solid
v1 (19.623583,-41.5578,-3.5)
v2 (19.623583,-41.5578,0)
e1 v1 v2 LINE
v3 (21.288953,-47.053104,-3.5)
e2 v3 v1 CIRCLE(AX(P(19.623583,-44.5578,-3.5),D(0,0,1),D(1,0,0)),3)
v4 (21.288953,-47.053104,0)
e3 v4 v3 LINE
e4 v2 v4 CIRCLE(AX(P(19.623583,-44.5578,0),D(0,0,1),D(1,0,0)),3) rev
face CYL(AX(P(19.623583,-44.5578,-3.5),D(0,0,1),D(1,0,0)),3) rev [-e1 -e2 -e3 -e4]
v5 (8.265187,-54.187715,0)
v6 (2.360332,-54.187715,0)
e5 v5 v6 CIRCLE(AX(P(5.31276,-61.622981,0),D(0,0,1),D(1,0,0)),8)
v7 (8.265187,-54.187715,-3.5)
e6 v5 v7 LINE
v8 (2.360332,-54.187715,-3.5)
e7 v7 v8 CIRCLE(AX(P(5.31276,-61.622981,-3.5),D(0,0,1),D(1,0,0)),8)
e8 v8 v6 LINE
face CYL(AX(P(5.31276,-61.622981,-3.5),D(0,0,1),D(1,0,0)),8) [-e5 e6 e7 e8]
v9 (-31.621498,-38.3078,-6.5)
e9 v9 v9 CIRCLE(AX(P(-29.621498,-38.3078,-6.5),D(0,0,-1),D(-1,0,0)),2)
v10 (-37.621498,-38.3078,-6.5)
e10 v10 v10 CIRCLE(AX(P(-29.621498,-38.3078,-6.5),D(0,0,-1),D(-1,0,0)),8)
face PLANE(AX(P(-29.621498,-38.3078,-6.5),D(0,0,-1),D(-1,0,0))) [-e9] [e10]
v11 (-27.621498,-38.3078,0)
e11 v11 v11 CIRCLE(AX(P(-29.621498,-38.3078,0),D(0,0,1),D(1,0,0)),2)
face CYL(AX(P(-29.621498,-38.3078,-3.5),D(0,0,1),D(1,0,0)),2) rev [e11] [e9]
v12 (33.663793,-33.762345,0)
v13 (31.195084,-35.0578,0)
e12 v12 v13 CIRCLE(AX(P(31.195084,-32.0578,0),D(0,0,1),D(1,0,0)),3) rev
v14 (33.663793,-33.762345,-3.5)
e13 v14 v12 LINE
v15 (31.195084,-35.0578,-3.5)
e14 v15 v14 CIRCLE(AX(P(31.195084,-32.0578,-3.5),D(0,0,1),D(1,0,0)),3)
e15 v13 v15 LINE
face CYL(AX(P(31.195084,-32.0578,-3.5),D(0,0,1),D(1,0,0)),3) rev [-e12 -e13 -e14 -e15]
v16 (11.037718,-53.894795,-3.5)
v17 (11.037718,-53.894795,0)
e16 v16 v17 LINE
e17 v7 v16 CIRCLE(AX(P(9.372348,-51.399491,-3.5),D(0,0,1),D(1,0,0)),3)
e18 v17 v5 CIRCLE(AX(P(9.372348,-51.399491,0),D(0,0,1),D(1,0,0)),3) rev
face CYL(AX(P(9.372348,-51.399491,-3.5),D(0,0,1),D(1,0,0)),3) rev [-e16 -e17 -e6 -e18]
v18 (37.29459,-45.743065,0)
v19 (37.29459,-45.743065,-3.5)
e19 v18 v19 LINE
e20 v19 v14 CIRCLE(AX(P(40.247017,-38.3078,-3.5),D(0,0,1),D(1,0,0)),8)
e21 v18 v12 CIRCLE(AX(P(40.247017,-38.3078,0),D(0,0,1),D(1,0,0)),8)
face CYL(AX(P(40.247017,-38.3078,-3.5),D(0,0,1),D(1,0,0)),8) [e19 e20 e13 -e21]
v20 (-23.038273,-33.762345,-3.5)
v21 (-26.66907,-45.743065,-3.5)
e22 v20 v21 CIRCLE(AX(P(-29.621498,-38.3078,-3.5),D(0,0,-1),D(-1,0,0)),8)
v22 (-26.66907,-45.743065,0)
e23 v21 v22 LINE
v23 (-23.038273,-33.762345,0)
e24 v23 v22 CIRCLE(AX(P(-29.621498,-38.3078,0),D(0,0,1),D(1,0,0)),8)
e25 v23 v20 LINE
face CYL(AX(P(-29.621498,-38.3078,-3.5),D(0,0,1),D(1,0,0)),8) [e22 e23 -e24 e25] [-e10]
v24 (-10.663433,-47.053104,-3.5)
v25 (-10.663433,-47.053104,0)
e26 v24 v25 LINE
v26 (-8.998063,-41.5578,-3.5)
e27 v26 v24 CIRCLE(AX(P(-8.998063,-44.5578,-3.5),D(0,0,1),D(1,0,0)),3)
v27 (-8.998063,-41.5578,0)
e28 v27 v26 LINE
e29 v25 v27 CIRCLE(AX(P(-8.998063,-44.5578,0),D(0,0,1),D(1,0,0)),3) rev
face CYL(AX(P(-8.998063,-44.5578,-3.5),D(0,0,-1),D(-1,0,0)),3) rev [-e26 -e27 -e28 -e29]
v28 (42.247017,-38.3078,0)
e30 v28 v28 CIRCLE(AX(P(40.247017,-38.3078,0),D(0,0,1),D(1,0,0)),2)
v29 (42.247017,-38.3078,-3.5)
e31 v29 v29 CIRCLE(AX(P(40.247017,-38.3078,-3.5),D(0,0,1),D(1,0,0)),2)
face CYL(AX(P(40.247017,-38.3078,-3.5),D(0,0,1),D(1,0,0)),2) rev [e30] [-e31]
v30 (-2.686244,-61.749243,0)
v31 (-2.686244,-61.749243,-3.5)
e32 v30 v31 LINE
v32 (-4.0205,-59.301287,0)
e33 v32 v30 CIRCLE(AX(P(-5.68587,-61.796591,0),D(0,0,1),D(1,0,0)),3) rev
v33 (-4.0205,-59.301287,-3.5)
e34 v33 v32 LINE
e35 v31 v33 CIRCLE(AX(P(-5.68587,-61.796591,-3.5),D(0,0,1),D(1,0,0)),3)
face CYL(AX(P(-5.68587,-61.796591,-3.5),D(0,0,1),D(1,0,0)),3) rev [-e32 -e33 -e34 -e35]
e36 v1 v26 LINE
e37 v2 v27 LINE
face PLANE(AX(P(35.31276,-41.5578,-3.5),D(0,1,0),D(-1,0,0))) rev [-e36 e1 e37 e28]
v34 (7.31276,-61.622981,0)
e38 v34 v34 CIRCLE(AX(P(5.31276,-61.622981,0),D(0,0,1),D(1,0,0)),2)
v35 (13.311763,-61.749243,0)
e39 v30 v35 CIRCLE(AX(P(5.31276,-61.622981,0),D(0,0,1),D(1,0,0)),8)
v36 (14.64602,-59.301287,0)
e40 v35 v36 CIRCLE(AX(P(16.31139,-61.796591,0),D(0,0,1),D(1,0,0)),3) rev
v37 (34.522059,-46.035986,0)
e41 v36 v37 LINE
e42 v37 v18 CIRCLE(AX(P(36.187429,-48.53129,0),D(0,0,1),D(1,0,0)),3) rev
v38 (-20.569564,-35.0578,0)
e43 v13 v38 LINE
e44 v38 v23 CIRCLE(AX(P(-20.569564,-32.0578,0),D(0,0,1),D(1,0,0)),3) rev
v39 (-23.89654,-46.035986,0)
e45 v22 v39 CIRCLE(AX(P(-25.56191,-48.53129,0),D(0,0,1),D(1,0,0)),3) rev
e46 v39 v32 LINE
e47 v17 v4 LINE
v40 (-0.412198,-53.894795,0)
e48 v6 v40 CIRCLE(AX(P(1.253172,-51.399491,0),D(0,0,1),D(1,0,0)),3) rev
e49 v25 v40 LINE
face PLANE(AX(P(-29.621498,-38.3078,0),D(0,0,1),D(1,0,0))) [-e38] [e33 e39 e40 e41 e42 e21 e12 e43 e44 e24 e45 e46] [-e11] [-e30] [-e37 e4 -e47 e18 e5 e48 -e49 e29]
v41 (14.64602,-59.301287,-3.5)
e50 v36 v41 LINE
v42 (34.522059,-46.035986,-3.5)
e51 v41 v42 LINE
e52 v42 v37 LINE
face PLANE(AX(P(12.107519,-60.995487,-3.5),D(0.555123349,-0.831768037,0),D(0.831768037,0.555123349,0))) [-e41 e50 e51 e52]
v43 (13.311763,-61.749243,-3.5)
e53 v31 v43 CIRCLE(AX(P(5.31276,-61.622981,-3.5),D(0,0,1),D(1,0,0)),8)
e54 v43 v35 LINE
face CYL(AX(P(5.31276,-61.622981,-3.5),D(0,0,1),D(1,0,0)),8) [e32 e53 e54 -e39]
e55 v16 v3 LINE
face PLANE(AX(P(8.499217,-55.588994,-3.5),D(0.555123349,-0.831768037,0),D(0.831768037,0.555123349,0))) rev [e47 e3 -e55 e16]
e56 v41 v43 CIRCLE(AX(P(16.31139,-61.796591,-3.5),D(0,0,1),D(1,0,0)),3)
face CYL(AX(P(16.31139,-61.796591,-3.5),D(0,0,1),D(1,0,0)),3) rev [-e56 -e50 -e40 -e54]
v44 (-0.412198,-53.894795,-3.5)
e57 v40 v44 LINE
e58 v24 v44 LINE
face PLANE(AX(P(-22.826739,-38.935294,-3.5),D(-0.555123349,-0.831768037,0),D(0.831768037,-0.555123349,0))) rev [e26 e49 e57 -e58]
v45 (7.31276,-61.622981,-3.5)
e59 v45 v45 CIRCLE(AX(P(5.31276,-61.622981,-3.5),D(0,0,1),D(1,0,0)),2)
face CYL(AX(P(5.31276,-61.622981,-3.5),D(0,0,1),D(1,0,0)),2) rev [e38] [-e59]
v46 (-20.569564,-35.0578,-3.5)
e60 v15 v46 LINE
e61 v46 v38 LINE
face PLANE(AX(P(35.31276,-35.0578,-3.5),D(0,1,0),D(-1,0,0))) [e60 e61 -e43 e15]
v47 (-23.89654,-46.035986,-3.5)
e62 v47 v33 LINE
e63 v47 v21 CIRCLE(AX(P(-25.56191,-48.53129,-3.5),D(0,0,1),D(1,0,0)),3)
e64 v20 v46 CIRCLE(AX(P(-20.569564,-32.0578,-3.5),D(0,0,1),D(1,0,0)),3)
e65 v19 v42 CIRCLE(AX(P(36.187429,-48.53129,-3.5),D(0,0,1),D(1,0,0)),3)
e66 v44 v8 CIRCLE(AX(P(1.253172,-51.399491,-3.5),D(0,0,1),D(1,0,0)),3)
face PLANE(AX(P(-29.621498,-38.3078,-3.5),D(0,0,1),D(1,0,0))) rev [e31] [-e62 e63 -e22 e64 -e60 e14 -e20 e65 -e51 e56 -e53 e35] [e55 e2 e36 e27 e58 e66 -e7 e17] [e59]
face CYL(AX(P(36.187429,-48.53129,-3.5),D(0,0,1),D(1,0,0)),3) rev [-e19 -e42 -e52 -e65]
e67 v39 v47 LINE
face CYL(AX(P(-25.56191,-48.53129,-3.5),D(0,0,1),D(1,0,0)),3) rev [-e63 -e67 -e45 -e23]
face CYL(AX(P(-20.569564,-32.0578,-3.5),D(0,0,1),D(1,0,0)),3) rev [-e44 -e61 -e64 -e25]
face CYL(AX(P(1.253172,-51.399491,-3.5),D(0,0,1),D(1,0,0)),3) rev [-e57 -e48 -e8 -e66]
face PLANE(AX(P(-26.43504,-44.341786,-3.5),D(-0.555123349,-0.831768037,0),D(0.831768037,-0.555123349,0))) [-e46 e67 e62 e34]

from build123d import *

# Parameters (mm, degrees)
SKETCH1_R             = 8
SKETCH1_R_2           = 2
BOSS_EXTRUDE1_DEPTH   = 3.5
BOSS_EXTRUDE1_2_DEPTH = 3.5
BOSS_EXTRUDE1_3_DEPTH = 3.5
SKETCH4_W             = 60
SKETCH4_H             = 6.5
EXTRUDE_THIN1_DEPTH   = 3.5
FILLET1_R             = 3
SKETCH_1_R            = 8
SKETCH_1_R_2          = 2
EXTRUDE_1_DEPTH       = 3
FILLET_2_R            = 3


with BuildPart() as part:
    # Sketch1 → Boss-Extrude1 (new body)
    with BuildSketch(Plane.XY):
        with Locations((-29.621497739, -38.307799929)):
            Circle(SKETCH1_R)
        with Locations((-29.621497739, -38.307799929)):
            Circle(SKETCH1_R_2, mode=Mode.SUBTRACT)
    extrude(amount=-BOSS_EXTRUDE1_DEPTH)



with BuildPart() as body_2:
    # Sketch1 → Boss-Extrude1 2 (new body)
    with BuildSketch(Plane.XY):
        with Locations((40.247017363, -38.307799929)):
            Circle(SKETCH1_R)
        with Locations((40.247017363, -38.307799929)):
            Circle(SKETCH1_R_2, mode=Mode.SUBTRACT)
    extrude(amount=-BOSS_EXTRUDE1_2_DEPTH)


with BuildPart() as body_3:
    # Sketch1 → Boss-Extrude1 3 (new body)
    with BuildSketch(Plane.XY):
        with Locations((5.312759812, -61.622980593)):
            Circle(SKETCH1_R)
        with Locations((5.312759812, -61.622980593)):
            Circle(SKETCH1_R_2, mode=Mode.SUBTRACT)
    extrude(amount=-BOSS_EXTRUDE1_3_DEPTH)


with BuildPart() as part_1:
    add(part.part)

    add(body_2.part)  # Extrude-Thin1 merges body 2

    add(body_3.part)  # Extrude-Thin1 merges body 3
    # Sketch4 → Extrude-Thin1 (add)
    with BuildSketch(Plane.XY):
        with Locations((5.312759812, -38.307799929)):
            Rectangle(SKETCH4_W, SKETCH4_H)
        Polygon((-26.435040402, -44.341786144), (-1.481999294, -60.995486618), (2.126302475, -55.588994378), (-22.826738632, -38.935293904), align=None)
        Polygon((12.107518918, -60.995486618), (37.060560026, -44.341786144), (33.452258256, -38.935293904), (8.499217149, -55.588994378), align=None)
    extrude(amount=-EXTRUDE_THIN1_DEPTH)

    # Fillet1
    fillet1_edges = [part_1.edges().sort_by_distance(p)[0] for p in [
        (-18.897311611, -41.557799929, -1.75),
        (1.036606698, -54.861729633, -1.75),
        (9.588912926, -54.861729633, -1.75),
        (29.522831235, -41.557799929, -1.75),
    ]]
    fillet(fillet1_edges, radius=FILLET1_R)

    # 草图1 → 凸台-拉伸1 (add)
    with BuildSketch(Plane(origin=(0, 0, -3.5), x_dir=(-1, 0, 0), z_dir=(0, 0, -1))):
        with Locations(Location((29.621497739, -38.307799929, 0), (0, 0, 156.030517682))):
            Circle(SKETCH_1_R)
        with Locations(Location((29.621497739, -38.307799929, 0), (0, 0, 180))):
            Circle(SKETCH_1_R_2, mode=Mode.SUBTRACT)
    extrude(amount=EXTRUDE_1_DEPTH)

    # 圆角2
    # the kernel refuses this fillet: 3 mm, written as the material it adds along each edge
    with BuildSketch(Plane(origin=(-22.31140198, -35.057799929, -3.5), x_dir=(1, 0, 0), z_dir=(0, 0, 1)), Plane(origin=(-2.571695072, -60.268221873, -3.5), x_dir=(-0.8317680369208076, 0.5551233491368437, 0), z_dir=(0, 0, 1)), Plane(origin=(35.970864249, -45.069050889, -3.5), x_dir=(-0.8317680369208071, -0.5551233491368445, 0), z_dir=(0, 0, 1))) as fillet_2_piece_1:
        with BuildLine():
            CenterArc((1.741837737, 3), FILLET_2_R, 214.623535479, 55.376464521)
            ThreePointArc((-0.726871399, 1.295454545), (-0.333303043, 0.664634517), (0, 0))
            Line((0, 0), (1.741837737, 0))
        make_face()
    extrude(amount=3.5)
    with BuildSketch(Plane(origin=(32.936921604, -35.057799929, -3.5), x_dir=(0.4893293145989847, 0.8720990894812859, 0), z_dir=(0, 0, 1)), Plane(origin=(-25.345344625, -45.069050889, -3.5), x_dir=(-0.8911310507438419, -0.45374601970725476, 0), z_dir=(0, 0, 1))) as fillet_2_piece_2:
        with BuildLine():
            CenterArc((1.763965003, 2.987043048), FILLET_2_R, 209.296508898, 55.376464521)
            Line((-0.852332266, 1.519055104), (0, 0))
            ThreePointArc((0, 0), (0.742722106, 0.034551872), (1.485444213, 0))
        make_face()
    extrude(amount=3.5)
    with BuildSketch(Plane(origin=(13.197214696, -60.268221873, -3.5), x_dir=(0.8317680369208036, 0.5551233491368496, 0), z_dir=(0, 0, 1))) as fillet_2_piece_3:
        with BuildLine():
            CenterArc((1.741837737, -3), FILLET_2_R, 90, 55.376464521)
            ThreePointArc((-0.726871399, -1.295454545), (-0.333303043, -0.664634517), (0, 0))
            Line((0, 0), (1.741837737, 0))
        make_face()
    extrude(amount=3.5)


solid = part_1.part
